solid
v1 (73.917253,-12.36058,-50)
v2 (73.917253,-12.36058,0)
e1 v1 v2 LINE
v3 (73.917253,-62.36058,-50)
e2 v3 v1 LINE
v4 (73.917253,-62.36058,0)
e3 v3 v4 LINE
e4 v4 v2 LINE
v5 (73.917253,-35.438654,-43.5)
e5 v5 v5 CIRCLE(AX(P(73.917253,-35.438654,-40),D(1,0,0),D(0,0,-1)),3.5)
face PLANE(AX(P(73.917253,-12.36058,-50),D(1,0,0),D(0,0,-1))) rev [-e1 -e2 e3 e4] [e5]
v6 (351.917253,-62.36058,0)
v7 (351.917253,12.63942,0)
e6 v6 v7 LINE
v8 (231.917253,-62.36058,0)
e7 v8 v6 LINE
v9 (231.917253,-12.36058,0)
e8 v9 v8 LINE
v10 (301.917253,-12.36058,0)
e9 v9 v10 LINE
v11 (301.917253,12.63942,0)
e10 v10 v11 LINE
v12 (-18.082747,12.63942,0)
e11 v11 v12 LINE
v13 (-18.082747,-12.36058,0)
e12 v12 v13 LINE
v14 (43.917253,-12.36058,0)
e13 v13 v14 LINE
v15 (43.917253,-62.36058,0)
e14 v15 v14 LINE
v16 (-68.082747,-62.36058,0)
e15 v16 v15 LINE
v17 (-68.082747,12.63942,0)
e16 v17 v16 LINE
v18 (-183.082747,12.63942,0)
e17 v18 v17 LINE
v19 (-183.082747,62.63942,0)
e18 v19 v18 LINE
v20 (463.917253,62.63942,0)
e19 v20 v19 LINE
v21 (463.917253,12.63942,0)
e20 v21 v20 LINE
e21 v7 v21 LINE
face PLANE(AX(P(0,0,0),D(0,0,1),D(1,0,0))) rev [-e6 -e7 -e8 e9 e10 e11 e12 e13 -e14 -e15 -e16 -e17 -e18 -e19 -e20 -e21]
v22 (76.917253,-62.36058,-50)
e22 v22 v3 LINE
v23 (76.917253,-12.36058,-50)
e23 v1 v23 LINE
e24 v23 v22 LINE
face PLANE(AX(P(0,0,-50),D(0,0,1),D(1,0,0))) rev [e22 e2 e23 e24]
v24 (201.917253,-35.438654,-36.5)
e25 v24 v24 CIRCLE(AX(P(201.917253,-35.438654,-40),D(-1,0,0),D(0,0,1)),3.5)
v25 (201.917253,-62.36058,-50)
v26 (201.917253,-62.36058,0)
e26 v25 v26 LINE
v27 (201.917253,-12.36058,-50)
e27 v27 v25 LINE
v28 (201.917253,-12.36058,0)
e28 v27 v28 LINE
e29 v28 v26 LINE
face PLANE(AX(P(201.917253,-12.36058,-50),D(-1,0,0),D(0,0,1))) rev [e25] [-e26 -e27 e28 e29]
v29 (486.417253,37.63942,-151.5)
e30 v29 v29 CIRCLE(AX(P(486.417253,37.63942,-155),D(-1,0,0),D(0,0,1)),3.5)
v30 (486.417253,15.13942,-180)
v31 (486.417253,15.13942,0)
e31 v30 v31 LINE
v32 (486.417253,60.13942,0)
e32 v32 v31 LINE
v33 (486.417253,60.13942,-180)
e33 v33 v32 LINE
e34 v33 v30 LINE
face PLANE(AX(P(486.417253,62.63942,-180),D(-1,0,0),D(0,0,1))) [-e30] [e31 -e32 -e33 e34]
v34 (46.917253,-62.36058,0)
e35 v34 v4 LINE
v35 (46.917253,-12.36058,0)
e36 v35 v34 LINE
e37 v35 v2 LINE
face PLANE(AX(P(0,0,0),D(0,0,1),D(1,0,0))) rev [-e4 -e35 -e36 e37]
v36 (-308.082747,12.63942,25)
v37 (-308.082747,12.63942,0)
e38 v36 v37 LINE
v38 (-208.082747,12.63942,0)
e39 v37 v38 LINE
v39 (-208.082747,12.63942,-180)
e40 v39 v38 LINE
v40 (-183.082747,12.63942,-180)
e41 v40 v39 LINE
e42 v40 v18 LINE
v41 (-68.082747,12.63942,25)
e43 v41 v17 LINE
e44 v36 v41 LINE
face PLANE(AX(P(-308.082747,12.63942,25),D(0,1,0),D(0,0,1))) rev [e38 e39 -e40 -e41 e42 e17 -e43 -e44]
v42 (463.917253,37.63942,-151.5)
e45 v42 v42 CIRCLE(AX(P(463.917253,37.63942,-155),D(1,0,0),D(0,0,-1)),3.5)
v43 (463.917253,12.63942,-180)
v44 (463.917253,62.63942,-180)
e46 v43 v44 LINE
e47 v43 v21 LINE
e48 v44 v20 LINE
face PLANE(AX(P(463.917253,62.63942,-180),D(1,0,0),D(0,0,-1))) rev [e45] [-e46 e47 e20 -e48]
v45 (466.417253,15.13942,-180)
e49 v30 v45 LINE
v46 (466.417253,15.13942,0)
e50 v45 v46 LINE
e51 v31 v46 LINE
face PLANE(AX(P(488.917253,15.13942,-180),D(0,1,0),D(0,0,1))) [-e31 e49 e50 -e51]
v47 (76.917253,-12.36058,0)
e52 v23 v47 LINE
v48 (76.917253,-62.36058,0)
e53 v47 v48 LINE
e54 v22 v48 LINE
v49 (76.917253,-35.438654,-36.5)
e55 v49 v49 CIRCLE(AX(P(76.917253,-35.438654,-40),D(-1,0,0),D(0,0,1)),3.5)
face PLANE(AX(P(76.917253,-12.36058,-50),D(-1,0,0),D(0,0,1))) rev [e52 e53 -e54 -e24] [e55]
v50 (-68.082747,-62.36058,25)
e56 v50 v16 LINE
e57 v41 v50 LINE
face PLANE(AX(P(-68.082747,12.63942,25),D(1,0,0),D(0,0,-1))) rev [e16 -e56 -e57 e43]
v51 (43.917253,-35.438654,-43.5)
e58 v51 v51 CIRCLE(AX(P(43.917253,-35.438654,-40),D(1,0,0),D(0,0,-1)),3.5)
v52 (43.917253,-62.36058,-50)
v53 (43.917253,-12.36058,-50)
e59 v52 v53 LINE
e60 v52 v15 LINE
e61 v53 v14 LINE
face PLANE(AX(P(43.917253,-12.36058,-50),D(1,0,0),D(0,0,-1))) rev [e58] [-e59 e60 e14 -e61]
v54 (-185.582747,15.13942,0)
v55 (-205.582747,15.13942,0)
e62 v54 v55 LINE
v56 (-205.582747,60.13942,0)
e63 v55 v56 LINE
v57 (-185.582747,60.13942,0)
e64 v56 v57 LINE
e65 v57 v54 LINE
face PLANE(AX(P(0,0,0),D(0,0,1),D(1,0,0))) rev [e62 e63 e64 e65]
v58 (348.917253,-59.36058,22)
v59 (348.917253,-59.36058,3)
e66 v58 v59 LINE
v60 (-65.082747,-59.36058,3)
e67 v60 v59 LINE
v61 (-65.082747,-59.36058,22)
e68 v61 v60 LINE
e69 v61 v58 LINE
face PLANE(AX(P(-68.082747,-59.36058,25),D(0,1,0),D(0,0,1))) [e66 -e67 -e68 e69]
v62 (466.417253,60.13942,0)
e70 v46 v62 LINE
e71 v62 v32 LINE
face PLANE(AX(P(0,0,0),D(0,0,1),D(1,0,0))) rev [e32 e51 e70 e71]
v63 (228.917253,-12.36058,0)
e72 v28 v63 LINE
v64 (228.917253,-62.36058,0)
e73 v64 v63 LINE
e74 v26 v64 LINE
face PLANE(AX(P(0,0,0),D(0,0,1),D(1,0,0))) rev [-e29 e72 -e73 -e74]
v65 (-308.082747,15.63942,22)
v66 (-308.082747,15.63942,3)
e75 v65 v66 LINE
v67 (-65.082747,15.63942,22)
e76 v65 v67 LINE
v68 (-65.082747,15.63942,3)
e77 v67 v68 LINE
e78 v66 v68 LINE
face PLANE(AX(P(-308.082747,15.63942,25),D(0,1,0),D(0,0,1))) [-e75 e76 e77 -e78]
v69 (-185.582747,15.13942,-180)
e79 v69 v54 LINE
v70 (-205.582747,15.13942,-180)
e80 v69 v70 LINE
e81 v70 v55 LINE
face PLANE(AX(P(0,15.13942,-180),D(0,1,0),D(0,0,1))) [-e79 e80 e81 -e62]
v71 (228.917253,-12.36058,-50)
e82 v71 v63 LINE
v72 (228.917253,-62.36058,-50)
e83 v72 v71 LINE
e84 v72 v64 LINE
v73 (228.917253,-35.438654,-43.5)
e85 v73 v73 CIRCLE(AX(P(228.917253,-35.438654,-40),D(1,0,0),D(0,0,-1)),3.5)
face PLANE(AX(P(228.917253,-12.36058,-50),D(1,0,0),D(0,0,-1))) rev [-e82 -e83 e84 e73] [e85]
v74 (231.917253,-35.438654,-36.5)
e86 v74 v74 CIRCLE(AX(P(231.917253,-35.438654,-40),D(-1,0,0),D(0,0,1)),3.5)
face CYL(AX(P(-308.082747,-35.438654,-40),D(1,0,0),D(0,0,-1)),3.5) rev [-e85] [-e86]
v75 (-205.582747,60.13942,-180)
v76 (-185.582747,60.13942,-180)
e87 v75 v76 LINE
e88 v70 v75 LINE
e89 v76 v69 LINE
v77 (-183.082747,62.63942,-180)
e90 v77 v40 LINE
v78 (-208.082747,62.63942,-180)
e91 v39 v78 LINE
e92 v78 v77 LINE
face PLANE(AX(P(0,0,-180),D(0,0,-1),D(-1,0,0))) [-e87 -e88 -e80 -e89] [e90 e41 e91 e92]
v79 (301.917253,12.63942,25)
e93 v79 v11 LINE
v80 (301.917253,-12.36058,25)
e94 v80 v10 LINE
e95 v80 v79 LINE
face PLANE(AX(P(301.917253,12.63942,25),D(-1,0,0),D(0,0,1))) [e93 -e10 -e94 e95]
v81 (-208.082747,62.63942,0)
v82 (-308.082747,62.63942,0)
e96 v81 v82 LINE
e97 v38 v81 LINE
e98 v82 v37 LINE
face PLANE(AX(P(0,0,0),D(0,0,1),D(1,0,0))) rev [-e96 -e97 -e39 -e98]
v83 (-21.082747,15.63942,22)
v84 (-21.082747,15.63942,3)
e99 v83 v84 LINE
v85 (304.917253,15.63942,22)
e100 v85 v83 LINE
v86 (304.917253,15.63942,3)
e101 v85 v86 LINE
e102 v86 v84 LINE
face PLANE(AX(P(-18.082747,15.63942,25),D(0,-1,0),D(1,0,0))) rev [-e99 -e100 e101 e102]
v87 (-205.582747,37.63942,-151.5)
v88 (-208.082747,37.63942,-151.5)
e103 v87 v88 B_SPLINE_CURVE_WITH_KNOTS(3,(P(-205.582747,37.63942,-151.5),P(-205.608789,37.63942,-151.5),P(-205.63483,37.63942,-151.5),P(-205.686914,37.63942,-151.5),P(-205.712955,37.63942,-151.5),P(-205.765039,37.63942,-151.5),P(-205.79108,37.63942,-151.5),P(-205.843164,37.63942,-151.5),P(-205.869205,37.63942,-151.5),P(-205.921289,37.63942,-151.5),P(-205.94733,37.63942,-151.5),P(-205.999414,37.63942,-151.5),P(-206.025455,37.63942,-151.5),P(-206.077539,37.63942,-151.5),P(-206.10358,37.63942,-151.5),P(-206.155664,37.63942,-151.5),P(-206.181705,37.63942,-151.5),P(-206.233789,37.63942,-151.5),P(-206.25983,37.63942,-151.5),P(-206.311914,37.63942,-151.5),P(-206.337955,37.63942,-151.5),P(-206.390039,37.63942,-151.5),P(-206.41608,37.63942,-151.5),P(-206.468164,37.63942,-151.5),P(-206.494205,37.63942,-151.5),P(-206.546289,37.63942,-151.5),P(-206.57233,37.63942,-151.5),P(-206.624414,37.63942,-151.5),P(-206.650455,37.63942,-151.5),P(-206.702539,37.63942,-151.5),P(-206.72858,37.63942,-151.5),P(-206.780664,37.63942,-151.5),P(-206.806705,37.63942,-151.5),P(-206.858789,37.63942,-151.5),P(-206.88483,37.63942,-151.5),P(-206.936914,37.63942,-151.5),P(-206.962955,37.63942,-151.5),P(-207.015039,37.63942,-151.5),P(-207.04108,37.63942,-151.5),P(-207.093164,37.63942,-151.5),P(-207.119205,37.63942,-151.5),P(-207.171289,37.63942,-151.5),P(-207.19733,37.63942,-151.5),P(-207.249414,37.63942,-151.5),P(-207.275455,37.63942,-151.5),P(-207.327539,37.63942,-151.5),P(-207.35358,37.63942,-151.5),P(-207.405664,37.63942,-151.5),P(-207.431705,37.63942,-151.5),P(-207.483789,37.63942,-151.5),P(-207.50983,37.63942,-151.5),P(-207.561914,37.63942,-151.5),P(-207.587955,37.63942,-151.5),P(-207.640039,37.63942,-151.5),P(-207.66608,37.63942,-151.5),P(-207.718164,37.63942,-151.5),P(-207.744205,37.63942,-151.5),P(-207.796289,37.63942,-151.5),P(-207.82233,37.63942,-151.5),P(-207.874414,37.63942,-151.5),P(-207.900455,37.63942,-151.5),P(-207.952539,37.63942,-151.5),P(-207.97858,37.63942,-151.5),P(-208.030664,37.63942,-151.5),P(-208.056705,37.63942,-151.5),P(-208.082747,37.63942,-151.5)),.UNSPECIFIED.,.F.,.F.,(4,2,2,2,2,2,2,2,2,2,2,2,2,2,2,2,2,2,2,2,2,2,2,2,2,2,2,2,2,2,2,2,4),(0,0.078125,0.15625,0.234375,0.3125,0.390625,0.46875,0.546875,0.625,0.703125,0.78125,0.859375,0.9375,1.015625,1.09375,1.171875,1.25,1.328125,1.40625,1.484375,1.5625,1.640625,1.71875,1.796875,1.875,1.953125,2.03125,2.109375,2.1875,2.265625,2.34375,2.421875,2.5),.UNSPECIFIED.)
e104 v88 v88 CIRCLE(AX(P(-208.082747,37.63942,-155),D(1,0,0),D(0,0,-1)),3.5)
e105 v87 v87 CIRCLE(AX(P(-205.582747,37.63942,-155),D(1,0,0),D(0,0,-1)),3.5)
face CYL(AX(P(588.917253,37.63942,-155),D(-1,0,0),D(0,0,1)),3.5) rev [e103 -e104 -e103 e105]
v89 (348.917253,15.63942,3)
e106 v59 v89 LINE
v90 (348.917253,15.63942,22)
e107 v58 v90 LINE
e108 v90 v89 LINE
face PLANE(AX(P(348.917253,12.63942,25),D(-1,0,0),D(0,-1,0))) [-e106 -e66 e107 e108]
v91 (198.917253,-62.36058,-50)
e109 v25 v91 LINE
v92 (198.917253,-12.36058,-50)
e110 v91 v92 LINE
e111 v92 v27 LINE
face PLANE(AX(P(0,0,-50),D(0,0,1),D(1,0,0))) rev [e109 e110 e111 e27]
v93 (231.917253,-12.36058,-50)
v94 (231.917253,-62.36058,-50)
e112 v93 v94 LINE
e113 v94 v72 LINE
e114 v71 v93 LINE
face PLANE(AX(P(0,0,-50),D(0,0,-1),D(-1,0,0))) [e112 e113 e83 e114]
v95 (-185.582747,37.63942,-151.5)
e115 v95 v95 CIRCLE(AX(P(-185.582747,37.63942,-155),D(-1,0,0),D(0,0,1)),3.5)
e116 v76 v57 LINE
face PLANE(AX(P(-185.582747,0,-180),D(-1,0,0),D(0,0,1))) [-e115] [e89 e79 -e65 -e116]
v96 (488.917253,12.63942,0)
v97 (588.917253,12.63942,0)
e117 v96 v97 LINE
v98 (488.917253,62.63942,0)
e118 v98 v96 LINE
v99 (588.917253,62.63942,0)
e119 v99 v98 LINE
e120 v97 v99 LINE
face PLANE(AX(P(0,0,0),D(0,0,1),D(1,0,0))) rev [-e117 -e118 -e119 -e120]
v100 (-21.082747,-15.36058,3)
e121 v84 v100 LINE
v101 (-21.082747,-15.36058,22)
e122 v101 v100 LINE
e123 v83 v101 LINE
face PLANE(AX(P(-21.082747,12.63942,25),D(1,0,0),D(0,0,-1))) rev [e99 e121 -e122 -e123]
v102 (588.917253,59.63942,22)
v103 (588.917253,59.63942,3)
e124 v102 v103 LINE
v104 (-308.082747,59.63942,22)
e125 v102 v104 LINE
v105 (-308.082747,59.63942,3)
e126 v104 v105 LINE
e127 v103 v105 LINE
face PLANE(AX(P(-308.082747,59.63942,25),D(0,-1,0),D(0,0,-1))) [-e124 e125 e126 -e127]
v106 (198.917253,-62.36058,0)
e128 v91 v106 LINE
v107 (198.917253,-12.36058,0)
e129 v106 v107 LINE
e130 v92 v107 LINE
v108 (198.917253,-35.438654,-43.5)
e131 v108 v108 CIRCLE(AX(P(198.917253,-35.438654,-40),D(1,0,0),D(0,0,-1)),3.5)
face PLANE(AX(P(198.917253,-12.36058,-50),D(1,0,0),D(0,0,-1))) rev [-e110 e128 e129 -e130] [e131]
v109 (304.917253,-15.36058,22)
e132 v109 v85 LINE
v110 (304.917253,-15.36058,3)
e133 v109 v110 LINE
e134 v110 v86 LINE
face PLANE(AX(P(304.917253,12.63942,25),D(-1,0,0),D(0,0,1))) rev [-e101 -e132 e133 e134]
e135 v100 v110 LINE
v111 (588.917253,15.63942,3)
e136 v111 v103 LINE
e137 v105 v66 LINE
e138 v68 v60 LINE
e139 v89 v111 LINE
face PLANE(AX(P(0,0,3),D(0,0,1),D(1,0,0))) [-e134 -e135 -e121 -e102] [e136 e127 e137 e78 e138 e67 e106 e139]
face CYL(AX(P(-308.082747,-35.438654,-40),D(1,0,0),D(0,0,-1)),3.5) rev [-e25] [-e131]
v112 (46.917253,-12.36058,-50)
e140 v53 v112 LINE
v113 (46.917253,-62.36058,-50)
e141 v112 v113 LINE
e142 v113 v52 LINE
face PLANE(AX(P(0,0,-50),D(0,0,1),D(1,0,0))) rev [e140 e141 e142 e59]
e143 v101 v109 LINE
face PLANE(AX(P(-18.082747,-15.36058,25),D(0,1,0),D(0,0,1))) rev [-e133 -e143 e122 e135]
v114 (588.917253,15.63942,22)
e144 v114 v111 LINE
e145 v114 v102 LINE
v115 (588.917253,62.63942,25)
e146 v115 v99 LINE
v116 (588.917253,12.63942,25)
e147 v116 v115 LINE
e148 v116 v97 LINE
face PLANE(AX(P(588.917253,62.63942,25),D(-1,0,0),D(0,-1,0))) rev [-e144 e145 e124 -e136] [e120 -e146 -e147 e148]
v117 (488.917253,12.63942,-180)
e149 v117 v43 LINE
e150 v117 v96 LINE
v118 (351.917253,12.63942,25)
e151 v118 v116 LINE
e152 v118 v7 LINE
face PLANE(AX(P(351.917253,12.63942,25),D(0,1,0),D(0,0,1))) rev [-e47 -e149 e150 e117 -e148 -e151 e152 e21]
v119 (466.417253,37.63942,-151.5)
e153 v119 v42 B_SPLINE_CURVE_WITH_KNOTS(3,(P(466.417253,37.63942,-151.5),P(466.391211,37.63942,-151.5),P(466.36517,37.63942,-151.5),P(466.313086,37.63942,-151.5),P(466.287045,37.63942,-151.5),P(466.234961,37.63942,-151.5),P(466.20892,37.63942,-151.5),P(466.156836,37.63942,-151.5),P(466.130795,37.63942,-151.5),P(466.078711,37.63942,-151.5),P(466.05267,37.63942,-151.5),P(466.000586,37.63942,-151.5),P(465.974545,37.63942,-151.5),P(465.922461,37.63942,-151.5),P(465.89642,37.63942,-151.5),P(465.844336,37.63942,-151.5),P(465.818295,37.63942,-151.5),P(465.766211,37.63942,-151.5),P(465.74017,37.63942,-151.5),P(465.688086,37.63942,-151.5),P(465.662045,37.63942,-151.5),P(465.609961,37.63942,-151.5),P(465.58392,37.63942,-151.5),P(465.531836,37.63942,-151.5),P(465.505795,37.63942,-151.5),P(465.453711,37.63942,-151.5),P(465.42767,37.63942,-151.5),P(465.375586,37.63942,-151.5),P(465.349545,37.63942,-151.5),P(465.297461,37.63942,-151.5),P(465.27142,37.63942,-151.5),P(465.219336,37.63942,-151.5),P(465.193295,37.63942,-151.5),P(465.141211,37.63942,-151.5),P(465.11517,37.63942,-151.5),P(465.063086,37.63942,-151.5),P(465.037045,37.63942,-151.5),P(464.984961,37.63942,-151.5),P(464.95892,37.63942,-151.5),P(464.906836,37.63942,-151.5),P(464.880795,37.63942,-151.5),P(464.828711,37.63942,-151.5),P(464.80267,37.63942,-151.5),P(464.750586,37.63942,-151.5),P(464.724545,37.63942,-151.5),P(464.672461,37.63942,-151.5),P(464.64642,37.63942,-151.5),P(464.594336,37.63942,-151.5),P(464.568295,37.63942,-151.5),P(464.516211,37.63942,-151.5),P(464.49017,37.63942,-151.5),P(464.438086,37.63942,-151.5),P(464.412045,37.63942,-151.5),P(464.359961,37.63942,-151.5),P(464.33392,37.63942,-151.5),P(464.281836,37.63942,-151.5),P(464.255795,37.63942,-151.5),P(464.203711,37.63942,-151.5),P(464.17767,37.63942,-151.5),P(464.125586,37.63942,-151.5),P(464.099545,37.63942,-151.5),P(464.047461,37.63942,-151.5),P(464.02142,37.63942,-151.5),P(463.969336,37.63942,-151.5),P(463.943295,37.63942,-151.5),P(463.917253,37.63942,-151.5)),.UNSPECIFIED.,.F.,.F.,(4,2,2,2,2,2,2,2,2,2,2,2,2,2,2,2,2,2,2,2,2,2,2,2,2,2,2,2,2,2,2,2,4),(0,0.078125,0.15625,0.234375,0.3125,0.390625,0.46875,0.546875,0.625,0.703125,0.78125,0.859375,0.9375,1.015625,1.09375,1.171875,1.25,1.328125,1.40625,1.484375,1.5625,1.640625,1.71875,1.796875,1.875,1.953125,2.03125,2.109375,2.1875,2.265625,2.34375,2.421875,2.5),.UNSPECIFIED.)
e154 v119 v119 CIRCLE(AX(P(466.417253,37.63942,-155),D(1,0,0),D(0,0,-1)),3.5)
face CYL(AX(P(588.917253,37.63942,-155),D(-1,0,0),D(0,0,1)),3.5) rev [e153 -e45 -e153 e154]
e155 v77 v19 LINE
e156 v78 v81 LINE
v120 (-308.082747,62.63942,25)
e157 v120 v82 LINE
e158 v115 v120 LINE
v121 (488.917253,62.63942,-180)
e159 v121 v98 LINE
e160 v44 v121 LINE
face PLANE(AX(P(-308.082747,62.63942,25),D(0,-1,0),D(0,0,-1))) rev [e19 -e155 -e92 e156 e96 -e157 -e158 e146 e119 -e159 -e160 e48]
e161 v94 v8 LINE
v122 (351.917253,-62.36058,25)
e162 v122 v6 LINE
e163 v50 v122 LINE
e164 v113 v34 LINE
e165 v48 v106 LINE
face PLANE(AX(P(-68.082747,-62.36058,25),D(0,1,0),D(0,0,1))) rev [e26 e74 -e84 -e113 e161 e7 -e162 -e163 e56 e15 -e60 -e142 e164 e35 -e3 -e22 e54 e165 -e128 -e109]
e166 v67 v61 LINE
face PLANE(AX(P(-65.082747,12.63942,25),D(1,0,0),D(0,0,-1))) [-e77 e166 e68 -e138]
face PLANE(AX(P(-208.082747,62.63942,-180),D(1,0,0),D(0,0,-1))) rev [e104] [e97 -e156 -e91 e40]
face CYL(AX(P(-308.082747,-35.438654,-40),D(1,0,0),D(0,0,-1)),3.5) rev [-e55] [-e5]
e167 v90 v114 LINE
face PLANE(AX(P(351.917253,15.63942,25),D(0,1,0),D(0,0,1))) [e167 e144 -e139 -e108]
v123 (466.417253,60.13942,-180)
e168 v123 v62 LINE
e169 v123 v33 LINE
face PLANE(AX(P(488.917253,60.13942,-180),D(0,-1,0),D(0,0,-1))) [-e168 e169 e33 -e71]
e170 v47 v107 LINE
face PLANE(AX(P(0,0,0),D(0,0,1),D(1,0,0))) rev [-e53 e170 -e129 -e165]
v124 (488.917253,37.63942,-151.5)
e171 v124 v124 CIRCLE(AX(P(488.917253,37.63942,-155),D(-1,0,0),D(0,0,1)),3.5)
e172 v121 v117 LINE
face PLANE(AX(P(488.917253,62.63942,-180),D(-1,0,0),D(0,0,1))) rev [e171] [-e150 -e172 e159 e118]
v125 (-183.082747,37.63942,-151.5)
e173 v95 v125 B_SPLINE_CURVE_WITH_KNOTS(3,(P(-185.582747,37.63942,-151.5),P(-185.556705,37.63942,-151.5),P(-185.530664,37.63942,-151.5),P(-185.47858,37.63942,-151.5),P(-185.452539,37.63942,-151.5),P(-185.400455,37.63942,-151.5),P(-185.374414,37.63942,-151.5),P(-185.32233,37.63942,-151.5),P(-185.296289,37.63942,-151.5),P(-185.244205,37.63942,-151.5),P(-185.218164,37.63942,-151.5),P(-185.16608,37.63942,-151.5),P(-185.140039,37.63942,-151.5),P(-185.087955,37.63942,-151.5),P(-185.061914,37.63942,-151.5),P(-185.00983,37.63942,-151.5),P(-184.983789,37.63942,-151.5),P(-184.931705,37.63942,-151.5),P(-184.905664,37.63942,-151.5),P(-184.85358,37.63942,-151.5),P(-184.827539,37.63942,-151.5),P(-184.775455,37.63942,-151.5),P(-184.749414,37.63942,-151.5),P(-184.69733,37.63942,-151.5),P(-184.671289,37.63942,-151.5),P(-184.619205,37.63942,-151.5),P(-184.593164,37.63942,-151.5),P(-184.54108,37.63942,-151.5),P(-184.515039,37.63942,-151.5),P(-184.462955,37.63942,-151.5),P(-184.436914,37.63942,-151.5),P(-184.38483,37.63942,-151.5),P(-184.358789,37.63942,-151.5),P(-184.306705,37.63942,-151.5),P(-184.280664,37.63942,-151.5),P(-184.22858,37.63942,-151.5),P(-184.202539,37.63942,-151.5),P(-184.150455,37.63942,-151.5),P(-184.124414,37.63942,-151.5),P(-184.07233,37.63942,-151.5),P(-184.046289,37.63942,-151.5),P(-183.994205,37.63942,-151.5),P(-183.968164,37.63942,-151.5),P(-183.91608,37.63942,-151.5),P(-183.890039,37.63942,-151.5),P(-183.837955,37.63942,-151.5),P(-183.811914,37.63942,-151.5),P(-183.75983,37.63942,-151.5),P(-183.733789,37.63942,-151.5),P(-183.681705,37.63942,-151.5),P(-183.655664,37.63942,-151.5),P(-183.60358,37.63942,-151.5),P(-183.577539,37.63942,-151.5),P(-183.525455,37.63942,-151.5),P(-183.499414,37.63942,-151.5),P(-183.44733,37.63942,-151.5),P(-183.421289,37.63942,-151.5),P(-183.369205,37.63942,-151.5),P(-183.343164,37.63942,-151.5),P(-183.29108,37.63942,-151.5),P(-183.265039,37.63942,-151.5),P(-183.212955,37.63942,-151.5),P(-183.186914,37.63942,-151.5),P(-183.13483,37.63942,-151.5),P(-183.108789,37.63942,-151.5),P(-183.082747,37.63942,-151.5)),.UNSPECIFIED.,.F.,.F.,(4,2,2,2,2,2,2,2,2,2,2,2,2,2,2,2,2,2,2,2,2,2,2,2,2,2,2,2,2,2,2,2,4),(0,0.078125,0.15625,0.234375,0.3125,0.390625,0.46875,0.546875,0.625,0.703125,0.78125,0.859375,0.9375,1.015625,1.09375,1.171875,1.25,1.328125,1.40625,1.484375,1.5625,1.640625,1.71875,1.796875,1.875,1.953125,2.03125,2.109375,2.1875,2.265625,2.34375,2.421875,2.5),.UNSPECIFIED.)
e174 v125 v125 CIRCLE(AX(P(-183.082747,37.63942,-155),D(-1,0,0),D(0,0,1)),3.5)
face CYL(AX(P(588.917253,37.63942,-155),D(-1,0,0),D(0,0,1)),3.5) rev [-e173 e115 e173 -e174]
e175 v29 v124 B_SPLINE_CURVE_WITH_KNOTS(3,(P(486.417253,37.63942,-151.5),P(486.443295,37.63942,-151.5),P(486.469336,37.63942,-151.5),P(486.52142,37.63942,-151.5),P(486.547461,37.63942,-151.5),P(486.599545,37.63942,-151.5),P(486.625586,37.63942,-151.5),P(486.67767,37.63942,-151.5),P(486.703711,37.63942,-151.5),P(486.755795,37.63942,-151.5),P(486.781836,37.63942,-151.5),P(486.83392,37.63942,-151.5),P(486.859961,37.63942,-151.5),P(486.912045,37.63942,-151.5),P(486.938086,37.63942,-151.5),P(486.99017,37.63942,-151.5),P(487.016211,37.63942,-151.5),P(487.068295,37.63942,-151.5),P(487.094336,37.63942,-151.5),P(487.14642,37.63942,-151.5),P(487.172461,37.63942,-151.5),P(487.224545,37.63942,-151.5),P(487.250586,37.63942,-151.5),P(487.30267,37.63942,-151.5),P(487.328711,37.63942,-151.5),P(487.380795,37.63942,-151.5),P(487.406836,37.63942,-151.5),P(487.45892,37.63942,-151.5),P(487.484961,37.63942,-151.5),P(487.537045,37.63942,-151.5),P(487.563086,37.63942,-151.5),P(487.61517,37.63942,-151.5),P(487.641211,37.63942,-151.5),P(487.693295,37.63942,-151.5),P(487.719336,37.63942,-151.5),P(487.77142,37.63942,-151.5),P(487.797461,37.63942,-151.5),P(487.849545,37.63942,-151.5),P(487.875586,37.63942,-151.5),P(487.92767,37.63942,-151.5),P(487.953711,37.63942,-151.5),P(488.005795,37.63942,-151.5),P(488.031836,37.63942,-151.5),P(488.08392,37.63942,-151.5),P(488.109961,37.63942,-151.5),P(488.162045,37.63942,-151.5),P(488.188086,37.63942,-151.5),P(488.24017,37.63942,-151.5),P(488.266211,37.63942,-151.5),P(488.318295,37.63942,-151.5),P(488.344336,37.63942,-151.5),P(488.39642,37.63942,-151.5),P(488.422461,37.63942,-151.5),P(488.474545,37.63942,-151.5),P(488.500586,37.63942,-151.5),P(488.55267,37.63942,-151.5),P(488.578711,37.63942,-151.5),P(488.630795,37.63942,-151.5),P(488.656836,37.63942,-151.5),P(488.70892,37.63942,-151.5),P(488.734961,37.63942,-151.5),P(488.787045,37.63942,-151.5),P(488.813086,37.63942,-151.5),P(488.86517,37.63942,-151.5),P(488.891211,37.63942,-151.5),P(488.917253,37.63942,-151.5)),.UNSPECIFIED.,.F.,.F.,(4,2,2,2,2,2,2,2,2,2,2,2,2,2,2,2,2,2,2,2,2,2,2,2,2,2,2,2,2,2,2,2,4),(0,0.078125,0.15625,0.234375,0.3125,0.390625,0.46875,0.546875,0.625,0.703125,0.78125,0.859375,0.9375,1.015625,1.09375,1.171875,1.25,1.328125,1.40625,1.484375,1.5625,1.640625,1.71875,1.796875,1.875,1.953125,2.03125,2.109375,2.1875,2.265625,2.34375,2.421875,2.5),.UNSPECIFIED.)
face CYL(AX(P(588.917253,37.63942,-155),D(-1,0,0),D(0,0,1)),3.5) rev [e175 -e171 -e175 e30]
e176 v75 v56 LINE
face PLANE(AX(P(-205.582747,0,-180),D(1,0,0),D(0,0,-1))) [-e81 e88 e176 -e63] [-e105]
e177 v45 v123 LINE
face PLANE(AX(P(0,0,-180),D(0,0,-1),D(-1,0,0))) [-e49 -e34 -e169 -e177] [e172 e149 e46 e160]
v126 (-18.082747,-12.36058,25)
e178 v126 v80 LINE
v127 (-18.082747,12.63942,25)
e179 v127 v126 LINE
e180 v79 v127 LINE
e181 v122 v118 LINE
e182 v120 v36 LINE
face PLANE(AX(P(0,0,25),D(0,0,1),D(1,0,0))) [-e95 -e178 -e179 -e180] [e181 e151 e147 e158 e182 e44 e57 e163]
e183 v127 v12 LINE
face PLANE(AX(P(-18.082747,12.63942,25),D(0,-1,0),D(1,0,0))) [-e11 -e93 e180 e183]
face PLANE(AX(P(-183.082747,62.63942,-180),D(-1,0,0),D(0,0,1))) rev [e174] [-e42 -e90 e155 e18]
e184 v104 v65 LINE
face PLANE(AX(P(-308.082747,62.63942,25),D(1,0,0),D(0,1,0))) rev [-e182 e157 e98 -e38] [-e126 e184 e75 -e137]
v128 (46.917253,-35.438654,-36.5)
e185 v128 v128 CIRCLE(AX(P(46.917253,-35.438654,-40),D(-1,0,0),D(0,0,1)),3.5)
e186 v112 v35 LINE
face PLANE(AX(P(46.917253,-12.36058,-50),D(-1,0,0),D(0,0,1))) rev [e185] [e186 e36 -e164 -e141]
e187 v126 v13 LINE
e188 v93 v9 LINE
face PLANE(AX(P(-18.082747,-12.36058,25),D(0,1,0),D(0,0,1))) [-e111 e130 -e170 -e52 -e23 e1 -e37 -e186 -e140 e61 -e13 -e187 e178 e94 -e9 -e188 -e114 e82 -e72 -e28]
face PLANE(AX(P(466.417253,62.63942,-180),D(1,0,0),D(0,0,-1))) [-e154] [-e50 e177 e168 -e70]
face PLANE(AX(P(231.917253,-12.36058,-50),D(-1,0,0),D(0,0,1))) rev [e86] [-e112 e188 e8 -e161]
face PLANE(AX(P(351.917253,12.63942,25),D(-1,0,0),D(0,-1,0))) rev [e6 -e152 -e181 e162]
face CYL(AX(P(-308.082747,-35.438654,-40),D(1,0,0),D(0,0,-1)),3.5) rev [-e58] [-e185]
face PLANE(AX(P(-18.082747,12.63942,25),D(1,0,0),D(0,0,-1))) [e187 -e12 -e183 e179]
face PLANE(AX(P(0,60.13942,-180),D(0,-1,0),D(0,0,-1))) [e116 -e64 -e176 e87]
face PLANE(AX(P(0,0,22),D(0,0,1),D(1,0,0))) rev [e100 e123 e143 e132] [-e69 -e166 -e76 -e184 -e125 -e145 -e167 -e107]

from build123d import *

# Parameters (mm, degrees)
SKETCH1_W               = 320
SKETCH1_H               = 25
BOSS_EXTRUDE1_DEPTH     = 25
SHELL1_T                = -3
SKETCH5_W               = 3
SKETCH5_H               = 50
BOSS_EXTRUDE3_DEPTH     = 50
CUT_EXTRUDE1_DEPTH      = 546.915466805
CUT_EXTRUDE1_DEPTH_BACK = 546.915466805
SKETCH6_R               = 3.5
SKETCH7_W               = 25
SKETCH7_H               = 50
SKETCH7_W_2             = 20
SKETCH7_H_2             = 45
EXTRUDE_THIN1_DEPTH     = 180
CUT_EXTRUDE2_DEPTH      = 820.470986001
CUT_EXTRUDE2_DEPTH_BACK = 820.470986001
SKETCH8_R               = 3.5


with BuildPart() as part:
    # Sketch1 → Boss-Extrude1 (new body)
    with BuildSketch(Plane.XY):
        Polygon((351.917253095, 12.639419675), (588.917253095, 12.639419675), (588.917253095, 62.639419675), (-308.082746905, 62.639419675), (-308.082746905, 12.639419675), (-68.082746905, 12.639419675), (-68.082746905, -62.360580325), (351.917253095, -62.360580325), align=None)
        with Locations((141.917253095, 0.139419675)):
            Rectangle(SKETCH1_W, SKETCH1_H, mode=Mode.SUBTRACT)
    extrude(amount=BOSS_EXTRUDE1_DEPTH)

    # Shell1
    shell1_openings = [part.faces().sort_by_distance(p)[0] for p in [
        (-308.082746905, 37.639419675, 12.5),
        (588.917253095, 37.639419675, 12.5),
    ]]
    offset(amount=SHELL1_T, openings=shell1_openings, kind=Kind.INTERSECTION)

    # Sketch5 → Boss-Extrude3 (add)
    with BuildSketch(Plane(origin=(0, 0, 0), x_dir=(-1, 0, 0), z_dir=(0, 0, -1))):
        with Locations((-230.417253095, -37.360580325)):
            Rectangle(SKETCH5_W, SKETCH5_H)
        with Locations((-200.417253095, -37.360580325)):
            Rectangle(SKETCH5_W, SKETCH5_H)
        with Locations((-75.417253095, -37.360580325)):
            Rectangle(SKETCH5_W, SKETCH5_H)
        with Locations((-45.417253095, -37.360580325)):
            Rectangle(SKETCH5_W, SKETCH5_H)
    extrude(amount=BOSS_EXTRUDE3_DEPTH)

    # Sketch6 → Cut-Extrude1 (cut, two sides: drawn at the far end of the back side and taken through both)
    with BuildSketch(Plane(origin=(231.917253095, 0, 0), x_dir=(0, 0, -1), z_dir=(1, 0, 0)).offset(-CUT_EXTRUDE1_DEPTH_BACK)):
        with Locations((40, -35.438653819)):
            Circle(SKETCH6_R)
    extrude(amount=CUT_EXTRUDE1_DEPTH + CUT_EXTRUDE1_DEPTH_BACK, mode=Mode.SUBTRACT)

    # Sketch7 → Extrude-Thin1 (add)
    # profile 1 of 2: a face of its own
    with BuildSketch(Plane(origin=(0, 0, 0), x_dir=(-1, 0, 0), z_dir=(0, 0, -1))):
        with Locations((-476.417253095, 37.639419675)):
            Rectangle(SKETCH7_W, SKETCH7_H)
        with Locations((-476.417253095, 37.639419675)):
            Rectangle(SKETCH7_W_2, SKETCH7_H_2, mode=Mode.SUBTRACT)
    # profile 2 of 2: a face of its own
    with BuildSketch(Plane(origin=(0, 0, 0), x_dir=(-1, 0, 0), z_dir=(0, 0, -1))):
        with Locations((195.582746905, 37.639419675)):
            Rectangle(SKETCH7_W, SKETCH7_H)
        with Locations((195.582746905, 37.639419675)):
            Rectangle(SKETCH7_W_2, SKETCH7_H_2, mode=Mode.SUBTRACT)
    extrude(amount=EXTRUDE_THIN1_DEPTH)

    # Sketch8 → Cut-Extrude2 (cut, two sides: drawn at the far end of the back side and taken through both)
    with BuildSketch(Plane.ZY.offset(208.082746905).offset(-CUT_EXTRUDE2_DEPTH_BACK)):
        with Locations((-155, 37.639419675)):
            Circle(SKETCH8_R)
    extrude(amount=CUT_EXTRUDE2_DEPTH + CUT_EXTRUDE2_DEPTH_BACK, mode=Mode.SUBTRACT)


solid = part.part
